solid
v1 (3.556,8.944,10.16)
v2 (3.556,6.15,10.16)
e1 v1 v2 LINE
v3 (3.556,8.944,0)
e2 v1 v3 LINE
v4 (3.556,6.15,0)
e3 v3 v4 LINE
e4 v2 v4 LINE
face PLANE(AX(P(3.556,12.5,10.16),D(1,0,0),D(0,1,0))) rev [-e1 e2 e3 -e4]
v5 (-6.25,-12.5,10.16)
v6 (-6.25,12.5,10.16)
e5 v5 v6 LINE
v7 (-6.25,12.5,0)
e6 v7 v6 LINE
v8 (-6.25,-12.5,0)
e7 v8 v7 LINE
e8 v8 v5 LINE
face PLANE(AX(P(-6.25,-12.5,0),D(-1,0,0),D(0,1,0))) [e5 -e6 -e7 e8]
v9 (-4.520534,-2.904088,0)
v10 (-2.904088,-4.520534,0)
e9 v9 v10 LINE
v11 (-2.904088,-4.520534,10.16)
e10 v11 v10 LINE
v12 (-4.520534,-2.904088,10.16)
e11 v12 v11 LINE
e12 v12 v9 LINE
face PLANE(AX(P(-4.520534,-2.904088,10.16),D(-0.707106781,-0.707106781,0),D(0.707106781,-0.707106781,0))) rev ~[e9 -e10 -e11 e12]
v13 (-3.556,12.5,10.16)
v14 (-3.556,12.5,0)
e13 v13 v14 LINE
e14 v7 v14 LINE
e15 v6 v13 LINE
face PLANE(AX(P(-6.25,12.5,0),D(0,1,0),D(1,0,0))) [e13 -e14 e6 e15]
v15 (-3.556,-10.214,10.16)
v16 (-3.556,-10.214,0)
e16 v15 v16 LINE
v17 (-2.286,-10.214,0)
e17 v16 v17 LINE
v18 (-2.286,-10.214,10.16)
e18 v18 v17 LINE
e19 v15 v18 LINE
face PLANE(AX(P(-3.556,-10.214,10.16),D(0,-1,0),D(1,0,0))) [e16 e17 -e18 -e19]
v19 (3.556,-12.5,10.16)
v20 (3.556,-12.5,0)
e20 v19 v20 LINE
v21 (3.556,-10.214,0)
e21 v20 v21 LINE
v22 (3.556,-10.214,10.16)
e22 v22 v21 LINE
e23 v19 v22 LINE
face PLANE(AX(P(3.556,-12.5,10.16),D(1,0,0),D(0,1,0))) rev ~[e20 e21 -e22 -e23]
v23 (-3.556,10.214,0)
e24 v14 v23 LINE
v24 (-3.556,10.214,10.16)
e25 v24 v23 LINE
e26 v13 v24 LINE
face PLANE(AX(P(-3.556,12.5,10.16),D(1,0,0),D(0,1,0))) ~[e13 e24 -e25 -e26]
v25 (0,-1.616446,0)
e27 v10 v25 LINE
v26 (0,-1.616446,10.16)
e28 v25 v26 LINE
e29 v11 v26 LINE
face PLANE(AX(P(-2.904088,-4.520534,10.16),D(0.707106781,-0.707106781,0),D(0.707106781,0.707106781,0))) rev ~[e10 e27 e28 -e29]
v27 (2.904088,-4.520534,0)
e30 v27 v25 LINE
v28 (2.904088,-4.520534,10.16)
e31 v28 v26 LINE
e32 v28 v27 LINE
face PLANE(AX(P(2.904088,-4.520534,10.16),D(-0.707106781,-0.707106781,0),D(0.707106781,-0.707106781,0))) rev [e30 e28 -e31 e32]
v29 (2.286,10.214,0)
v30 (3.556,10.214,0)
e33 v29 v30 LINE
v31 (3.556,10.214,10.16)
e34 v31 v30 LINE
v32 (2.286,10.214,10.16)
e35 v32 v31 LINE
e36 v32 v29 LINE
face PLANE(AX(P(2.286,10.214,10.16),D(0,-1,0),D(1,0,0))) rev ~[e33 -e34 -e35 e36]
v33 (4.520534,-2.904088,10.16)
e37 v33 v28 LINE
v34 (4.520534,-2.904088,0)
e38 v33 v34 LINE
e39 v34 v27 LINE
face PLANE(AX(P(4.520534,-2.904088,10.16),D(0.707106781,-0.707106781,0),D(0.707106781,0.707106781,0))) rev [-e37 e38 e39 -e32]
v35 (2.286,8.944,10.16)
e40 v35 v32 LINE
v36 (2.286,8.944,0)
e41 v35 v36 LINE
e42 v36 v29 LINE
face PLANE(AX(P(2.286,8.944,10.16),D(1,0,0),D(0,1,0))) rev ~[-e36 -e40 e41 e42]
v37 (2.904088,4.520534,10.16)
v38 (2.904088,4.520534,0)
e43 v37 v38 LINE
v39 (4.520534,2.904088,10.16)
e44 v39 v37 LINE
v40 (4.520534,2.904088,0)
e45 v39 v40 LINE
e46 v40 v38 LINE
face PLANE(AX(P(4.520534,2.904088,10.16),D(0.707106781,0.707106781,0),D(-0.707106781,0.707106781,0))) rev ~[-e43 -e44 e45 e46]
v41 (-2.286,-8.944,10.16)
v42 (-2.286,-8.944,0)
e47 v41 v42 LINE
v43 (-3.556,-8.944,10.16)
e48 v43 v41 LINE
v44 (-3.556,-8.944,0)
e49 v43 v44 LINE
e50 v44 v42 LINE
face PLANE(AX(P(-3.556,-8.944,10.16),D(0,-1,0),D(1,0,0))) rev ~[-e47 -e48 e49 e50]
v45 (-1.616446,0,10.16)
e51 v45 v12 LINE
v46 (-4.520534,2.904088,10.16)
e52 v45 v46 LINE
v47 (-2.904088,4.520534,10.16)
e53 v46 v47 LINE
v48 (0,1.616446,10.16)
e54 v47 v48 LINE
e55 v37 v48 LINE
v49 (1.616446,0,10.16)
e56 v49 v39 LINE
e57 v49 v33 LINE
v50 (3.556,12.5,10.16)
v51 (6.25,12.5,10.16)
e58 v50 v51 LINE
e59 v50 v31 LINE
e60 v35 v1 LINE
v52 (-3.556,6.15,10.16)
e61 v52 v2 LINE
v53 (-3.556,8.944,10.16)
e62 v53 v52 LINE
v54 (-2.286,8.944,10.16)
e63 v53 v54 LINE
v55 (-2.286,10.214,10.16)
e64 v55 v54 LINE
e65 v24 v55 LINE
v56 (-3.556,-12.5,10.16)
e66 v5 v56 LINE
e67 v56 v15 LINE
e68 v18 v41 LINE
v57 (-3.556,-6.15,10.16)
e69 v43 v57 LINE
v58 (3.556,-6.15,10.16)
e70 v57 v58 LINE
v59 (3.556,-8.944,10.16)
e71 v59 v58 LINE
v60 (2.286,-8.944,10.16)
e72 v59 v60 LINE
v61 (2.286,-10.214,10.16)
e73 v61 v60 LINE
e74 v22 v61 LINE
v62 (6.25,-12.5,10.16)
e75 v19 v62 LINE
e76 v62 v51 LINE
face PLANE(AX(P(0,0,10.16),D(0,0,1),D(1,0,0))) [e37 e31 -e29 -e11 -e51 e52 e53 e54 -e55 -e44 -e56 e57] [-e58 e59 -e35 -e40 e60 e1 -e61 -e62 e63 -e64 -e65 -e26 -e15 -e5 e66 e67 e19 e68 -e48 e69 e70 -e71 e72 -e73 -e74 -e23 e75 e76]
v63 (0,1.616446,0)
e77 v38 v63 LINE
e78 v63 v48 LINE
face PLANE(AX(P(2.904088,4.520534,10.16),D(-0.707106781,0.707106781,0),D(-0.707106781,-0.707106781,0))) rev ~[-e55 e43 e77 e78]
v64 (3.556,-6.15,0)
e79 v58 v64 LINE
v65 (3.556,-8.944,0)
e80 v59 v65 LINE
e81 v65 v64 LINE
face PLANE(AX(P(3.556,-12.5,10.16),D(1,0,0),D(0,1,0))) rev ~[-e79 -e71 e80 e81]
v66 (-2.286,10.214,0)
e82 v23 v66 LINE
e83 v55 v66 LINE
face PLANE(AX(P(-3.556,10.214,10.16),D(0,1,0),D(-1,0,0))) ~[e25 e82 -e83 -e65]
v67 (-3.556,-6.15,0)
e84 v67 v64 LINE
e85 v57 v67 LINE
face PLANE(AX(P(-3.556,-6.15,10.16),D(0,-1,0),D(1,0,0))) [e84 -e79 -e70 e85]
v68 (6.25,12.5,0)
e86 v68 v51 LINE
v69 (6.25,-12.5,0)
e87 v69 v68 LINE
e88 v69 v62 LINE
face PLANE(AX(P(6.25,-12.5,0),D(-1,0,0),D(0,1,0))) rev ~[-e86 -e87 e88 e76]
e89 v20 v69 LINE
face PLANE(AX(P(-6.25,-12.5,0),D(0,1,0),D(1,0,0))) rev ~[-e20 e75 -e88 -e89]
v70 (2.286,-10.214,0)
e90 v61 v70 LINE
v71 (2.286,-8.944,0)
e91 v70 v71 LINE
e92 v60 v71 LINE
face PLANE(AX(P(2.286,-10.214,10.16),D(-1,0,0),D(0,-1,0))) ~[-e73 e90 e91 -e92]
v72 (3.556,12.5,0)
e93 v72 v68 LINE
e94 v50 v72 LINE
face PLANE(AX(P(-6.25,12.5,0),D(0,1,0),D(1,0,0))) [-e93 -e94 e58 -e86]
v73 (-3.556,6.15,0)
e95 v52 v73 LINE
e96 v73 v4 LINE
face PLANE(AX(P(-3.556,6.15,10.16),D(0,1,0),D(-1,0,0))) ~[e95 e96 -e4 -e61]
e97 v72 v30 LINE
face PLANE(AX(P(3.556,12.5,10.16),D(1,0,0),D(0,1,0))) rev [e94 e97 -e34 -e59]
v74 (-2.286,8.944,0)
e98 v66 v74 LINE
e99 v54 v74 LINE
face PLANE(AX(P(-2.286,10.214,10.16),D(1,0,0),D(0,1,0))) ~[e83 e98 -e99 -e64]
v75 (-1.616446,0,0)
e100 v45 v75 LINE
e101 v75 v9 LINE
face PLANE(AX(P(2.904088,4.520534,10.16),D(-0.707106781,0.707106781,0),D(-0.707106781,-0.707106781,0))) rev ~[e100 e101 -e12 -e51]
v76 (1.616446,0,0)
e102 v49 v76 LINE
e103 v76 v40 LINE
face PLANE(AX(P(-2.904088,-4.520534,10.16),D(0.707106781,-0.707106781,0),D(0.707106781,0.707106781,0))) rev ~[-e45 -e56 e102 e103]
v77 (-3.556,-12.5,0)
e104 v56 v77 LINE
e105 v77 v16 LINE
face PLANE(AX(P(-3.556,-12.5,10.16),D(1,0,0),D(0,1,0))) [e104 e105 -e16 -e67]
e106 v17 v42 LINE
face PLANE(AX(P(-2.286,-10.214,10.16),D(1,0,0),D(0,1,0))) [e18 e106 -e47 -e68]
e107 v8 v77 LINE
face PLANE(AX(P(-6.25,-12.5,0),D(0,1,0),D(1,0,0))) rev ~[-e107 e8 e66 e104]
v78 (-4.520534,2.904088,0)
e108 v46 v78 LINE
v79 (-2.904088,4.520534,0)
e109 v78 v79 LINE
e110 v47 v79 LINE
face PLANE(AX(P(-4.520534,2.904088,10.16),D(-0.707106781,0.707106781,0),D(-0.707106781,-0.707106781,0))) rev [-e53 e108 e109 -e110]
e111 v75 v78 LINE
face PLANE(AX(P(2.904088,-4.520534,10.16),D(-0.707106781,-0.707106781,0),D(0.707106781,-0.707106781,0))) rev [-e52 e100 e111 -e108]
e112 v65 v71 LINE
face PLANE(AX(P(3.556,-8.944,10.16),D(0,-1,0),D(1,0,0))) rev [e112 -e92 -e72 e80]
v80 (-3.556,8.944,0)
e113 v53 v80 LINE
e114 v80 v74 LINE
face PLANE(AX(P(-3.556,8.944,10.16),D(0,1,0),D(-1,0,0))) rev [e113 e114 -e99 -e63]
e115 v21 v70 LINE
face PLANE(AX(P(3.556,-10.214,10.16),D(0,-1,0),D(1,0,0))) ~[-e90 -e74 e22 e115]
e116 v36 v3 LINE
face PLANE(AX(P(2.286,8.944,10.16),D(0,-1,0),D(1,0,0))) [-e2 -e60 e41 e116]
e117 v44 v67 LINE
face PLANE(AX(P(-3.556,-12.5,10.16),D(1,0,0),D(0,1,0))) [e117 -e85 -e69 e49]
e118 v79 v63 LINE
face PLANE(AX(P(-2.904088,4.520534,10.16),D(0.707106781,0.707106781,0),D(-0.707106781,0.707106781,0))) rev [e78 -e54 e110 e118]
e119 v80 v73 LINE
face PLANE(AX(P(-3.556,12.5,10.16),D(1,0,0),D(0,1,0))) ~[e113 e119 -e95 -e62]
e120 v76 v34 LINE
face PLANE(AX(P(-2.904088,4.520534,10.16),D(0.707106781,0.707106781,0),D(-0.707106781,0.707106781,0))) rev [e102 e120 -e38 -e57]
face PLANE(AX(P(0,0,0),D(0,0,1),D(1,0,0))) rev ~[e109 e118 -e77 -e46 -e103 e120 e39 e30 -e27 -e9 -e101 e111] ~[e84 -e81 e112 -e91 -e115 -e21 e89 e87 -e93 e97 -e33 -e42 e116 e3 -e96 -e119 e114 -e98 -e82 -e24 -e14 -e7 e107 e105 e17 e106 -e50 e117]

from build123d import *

# Parameters (mm, degrees)
F0_W             = 12.5
F0_H             = 25
F1_DEPTH         = 10.16
F2_W             = 7.112
F2_H             = 6.35
F3_DEPTH         = 25.4
F4_W             = 1.27
F4_H             = 1.27
F5_DEPTH         = 10.16
F5_COPIES2_COUNT = 2
F5_COPIES2_PITCH = 20.028927
F8_DEPTH         = 25.4


# Not quite as in the source:
# - a pattern or mirror of a feature is missing from the dataset's text; its kind, count and spacing are read off the source's solid


with BuildPart() as f1:
    # F0 (on Top) → F1 (new body)
    with BuildSketch(Plane.XY):
        Rectangle(F0_W, F0_H)
    extrude(amount=F1_DEPTH)

    # F2 (on face) → F3 (cut)
    with BuildSketch(Plane.XY.offset(10.16)):
        with Locations((0, -9.325)):
            Rectangle(F2_W, F2_H)
    f3 = extrude(amount=-F3_DEPTH, mode=Mode.SUBTRACT)

    # F3_copies: F3 across plane
    add(f3.mirror(Plane.ZX), mode=Mode.SUBTRACT)

    # F4 (on face) → F5 (join, through all)
    with BuildSketch(Plane.XY.offset(10.16)):
        with Locations((-2.921, -9.579)):
            Rectangle(F4_W, F4_H)
    f5 = extrude(amount=-F5_DEPTH)

    # F5_copies: F5 across plane
    add(f5.mirror(Plane(origin=(0, 0, 0), x_dir=(0, 0, 1), z_dir=(1, 0, 0))))

    # F5_copies1: F5 across plane
    add(f5.mirror(Plane.ZX))

    # F5_copies2: F5 ×2
    with Locations(*[Vector(0.2916781273, 0.9565165289, 0) * (i * F5_COPIES2_PITCH) for i in range(1, F5_COPIES2_COUNT)]):
        add(f5)

    # F7 (on face) → F8 (cut)
    with BuildSketch(Plane.XY.offset(10.16)):
        Polygon((-0.8082230509, 0.8082230509), (-4.5205336521, -2.9040875503), (-3.7123106012, -3.7123106012), (0, 0), align=None)
        Polygon((2.9040875503, 4.5205336521), (-0.8082230509, 0.8082230509), (0, 0), (-3.7123106012, -3.7123106012), (-2.9040875503, -4.5205336521), (4.5205336521, 2.9040875503), align=None)
    f8 = extrude(amount=-F8_DEPTH, mode=Mode.SUBTRACT)

    # F8_copies: F8 across plane
    add(f8.mirror(Plane(origin=(0, 0, 0), x_dir=(0, 0, 1), z_dir=(1, 0, 0))), mode=Mode.SUBTRACT)


solid = f1.part
